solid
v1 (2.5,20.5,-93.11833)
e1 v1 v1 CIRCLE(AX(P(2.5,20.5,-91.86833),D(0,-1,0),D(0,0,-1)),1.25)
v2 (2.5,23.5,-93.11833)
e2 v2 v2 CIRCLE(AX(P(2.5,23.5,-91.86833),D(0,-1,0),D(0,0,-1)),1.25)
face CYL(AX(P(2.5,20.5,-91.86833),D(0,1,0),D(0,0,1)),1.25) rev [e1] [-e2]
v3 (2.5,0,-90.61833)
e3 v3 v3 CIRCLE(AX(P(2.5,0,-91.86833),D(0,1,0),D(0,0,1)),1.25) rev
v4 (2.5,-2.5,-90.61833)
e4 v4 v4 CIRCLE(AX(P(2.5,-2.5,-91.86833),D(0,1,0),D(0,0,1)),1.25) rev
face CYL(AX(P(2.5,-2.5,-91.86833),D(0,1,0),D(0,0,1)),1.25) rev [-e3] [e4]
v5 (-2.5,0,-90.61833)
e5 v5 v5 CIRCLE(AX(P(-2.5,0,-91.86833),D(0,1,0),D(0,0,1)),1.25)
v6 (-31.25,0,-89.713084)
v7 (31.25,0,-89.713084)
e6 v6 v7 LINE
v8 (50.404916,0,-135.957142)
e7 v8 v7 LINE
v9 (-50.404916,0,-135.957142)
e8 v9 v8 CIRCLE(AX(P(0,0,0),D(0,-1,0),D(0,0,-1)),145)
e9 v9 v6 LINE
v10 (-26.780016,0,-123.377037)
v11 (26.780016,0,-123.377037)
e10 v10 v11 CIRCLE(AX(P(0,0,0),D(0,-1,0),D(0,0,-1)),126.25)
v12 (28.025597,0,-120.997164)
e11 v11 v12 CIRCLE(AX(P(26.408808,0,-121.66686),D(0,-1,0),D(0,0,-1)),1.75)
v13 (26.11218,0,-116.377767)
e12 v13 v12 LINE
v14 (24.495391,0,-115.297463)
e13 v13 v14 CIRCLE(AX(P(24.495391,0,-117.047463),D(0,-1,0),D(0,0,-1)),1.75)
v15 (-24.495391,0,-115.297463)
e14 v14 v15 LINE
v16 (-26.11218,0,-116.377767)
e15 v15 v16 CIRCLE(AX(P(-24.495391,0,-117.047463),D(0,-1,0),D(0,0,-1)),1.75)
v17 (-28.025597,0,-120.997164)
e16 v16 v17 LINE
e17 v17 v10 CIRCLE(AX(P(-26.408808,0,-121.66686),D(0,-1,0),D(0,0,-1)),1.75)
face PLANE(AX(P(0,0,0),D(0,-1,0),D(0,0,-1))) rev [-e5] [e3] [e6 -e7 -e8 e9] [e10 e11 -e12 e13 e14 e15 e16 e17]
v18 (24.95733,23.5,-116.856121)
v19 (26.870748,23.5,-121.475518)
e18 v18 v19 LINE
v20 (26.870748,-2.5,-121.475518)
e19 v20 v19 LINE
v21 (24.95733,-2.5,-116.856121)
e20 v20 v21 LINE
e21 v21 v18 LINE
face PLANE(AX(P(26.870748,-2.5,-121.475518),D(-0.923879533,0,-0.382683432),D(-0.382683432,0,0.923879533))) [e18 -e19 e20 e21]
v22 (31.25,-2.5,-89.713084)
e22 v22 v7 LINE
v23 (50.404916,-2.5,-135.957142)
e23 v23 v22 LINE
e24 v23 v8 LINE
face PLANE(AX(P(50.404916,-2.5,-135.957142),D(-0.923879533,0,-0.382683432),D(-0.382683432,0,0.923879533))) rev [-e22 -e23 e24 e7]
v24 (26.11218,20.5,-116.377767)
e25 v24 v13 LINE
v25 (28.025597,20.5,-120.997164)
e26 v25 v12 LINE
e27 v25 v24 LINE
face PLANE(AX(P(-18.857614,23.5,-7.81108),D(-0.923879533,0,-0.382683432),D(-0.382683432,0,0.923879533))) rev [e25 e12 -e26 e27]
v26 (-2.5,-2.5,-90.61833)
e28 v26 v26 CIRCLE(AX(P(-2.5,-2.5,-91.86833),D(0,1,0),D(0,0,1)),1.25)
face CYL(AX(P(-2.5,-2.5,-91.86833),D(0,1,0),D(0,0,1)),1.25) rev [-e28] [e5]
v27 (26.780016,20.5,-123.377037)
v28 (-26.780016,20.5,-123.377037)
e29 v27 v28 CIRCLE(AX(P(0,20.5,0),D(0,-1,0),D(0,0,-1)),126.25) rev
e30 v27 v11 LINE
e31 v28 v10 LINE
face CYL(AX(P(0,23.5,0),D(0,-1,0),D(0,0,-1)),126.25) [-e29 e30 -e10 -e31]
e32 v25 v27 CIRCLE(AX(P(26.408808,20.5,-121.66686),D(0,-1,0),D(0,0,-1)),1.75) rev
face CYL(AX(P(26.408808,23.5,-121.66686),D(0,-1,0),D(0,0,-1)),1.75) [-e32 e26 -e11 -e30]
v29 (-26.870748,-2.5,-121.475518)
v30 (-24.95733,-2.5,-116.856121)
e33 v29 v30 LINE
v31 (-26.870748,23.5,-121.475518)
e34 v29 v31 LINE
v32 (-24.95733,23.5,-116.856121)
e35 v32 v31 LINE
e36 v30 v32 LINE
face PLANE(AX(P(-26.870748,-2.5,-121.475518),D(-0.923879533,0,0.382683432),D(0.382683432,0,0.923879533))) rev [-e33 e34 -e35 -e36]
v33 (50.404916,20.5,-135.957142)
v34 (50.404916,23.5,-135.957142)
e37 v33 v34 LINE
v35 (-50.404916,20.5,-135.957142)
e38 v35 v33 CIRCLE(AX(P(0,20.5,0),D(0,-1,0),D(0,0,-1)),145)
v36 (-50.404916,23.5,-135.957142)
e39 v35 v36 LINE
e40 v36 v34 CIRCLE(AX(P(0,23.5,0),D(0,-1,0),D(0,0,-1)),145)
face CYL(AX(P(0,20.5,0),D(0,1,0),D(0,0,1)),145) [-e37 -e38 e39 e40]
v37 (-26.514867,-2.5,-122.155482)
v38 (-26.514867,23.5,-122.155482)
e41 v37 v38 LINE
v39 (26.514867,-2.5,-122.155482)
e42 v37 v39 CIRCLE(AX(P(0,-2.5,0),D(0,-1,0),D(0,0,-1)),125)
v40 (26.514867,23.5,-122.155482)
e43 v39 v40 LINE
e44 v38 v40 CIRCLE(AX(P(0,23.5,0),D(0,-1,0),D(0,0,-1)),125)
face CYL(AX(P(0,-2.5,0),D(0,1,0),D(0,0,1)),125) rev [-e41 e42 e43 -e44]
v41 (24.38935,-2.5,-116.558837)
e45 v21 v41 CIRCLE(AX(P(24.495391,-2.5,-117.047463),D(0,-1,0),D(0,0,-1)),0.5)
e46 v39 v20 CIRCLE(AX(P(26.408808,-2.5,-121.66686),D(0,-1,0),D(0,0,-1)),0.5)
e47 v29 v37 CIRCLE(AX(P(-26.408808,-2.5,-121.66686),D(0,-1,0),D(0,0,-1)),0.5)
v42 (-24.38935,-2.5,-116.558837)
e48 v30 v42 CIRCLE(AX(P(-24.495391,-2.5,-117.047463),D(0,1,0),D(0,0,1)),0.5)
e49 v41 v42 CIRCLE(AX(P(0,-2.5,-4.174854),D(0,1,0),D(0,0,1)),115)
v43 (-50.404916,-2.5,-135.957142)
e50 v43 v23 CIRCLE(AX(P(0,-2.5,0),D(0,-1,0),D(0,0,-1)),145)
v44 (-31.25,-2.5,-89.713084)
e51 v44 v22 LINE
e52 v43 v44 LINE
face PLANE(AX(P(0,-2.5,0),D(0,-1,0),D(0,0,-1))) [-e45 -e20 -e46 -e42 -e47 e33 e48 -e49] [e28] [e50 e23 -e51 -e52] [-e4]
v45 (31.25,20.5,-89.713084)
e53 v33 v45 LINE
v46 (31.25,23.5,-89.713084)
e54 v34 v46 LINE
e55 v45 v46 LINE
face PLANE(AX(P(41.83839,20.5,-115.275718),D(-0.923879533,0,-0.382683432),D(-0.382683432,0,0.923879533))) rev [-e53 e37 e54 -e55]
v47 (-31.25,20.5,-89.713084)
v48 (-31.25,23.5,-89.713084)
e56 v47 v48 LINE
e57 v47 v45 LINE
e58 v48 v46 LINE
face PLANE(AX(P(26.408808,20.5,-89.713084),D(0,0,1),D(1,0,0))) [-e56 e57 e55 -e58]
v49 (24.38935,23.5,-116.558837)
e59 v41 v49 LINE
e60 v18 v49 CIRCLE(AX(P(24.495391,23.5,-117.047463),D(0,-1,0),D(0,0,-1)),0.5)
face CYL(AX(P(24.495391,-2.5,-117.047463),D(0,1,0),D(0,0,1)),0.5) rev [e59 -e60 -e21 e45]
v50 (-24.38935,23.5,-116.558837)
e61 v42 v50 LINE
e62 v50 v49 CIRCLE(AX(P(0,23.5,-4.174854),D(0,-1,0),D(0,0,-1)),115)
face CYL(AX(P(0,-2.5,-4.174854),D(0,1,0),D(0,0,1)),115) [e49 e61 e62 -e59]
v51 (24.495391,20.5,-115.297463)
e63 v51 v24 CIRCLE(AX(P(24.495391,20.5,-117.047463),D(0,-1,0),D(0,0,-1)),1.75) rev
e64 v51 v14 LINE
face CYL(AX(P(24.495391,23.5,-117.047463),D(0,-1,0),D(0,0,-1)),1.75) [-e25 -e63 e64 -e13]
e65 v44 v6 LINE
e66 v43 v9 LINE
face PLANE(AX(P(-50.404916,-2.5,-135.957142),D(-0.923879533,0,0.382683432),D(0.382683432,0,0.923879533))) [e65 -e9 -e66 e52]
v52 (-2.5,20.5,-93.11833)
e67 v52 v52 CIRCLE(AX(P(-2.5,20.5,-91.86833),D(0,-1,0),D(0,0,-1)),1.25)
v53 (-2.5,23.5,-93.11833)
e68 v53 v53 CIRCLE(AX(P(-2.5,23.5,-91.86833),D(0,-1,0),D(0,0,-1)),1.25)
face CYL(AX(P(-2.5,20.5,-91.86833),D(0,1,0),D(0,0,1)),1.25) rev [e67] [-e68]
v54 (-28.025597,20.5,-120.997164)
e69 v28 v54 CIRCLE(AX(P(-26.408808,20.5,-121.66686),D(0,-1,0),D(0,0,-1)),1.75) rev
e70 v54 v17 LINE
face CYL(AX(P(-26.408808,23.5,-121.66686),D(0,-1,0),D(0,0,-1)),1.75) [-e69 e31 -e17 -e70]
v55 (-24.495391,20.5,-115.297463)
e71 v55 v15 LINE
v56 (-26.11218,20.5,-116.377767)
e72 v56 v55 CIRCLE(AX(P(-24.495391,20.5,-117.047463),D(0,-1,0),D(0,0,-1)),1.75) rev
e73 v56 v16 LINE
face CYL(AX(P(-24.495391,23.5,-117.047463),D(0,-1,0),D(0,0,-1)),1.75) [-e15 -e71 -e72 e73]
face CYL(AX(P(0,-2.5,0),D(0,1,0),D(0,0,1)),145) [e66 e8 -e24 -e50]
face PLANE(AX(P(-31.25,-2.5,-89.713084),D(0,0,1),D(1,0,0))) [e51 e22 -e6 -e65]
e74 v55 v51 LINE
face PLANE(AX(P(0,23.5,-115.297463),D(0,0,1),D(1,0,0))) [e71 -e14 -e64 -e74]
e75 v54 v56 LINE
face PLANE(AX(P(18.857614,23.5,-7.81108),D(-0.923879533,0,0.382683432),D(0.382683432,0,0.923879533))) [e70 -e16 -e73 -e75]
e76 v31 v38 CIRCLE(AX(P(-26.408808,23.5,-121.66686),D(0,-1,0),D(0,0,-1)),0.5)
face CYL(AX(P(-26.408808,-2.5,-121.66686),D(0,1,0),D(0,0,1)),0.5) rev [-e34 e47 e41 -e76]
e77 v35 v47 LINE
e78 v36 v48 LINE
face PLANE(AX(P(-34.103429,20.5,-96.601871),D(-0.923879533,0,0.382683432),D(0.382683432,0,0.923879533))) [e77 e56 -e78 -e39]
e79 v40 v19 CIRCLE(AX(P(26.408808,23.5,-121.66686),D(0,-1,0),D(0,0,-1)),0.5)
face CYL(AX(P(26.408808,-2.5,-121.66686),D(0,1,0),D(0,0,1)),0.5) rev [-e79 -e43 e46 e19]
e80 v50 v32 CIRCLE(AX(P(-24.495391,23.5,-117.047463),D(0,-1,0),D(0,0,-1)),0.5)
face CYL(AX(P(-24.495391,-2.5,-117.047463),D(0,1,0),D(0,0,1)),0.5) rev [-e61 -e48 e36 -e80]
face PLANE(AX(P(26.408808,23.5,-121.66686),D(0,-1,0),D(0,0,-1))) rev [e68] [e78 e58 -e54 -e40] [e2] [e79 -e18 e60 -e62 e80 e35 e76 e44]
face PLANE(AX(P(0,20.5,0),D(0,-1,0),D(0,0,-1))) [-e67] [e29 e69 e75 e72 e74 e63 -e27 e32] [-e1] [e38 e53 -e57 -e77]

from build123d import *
from build123d.topology import SkipClean

# Parameters (mm, degrees)
SKETCH1_R           = 1.25
BOSS_EXTRUDE1_DEPTH = 2.5
BOSS_EXTRUDE2_START = 23.5
BOSS_EXTRUDE2_DEPTH = 26
BOSS_EXTRUDE3_START = 23.5
SKETCH1_4_R         = 1.25
BOSS_EXTRUDE3_DEPTH = 3


with BuildPart() as part:
    # Sketch1 → Boss-Extrude1 (new body)
    with BuildSketch(Plane(origin=(0, 0, 0), x_dir=(1, 0, 0), z_dir=(0, 1, 0))):
        with BuildLine():
            Line((-50.40491586, 135.957141986), (-31.25, 89.71308433))
            Line((-31.25, 89.71308433), (31.25, 89.71308433))
            Line((31.25, 89.71308433), (50.40491586, 135.957141986))
            ThreePointArc((50.40491586, 135.957141986), (0, 145), (-50.40491586, 135.957141986))
        make_face()
        with Locations(Location((-2.5, 91.868329805, 0), (0, 0, 270))):
            Circle(SKETCH1_R, mode=Mode.SUBTRACT)
        with Locations(Location((2.5, 91.868329805, 0), (0, 0, 270))):
            Circle(SKETCH1_R, mode=Mode.SUBTRACT)
        with BuildLine():
            Line((-26.870747539, 121.475518488), (-24.957330377, 116.856120826))
            ThreePointArc((-24.957330377, 116.856120826), (-24.727253788, 116.604473302), (-24.389349959, 116.558836529))
            ThreePointArc((-24.389349959, 116.558836529), (0, 119.174853647), (24.389349959, 116.558836529))
            ThreePointArc((24.389349959, 116.558836529), (24.727253788, 116.604473302), (24.957330377, 116.856120826))
            Line((24.957330377, 116.856120826), (26.870747539, 121.475518488))
            ThreePointArc((26.870747539, 121.475518488), (26.851801477, 121.898714852), (26.514867242, 122.155482133))
            ThreePointArc((26.514867242, 122.155482133), (0, 125), (-26.514867242, 122.155482133))
            ThreePointArc((-26.514867242, 122.155482133), (-26.851801477, 121.898714852), (-26.870747539, 121.475518488))
        make_face(mode=Mode.SUBTRACT)
    extrude(amount=-BOSS_EXTRUDE1_DEPTH)

    # Sketch1<3> → Boss-Extrude2 (add)
    with SkipClean():  # the faces are left unmerged after this step: merging them gives an invalid solid
        with BuildSketch(Plane(origin=(0, 0, 0), x_dir=(1, 0, 0), z_dir=(0, 1, 0)).offset(BOSS_EXTRUDE2_START)):
            with BuildLine():
                ThreePointArc((-26.780015914, 123.377036954), (-27.959285739, 122.478351471), (-28.025596955, 120.997164198))
                Line((-28.025596955, 120.997164198), (-26.112179793, 116.377766535))
                ThreePointArc((-26.112179793, 116.377766535), (-25.467638519, 115.59239072), (-24.495390611, 115.297462542))
                Line((-24.495390611, 115.297462542), (24.495390611, 115.297462542))
                ThreePointArc((24.495390611, 115.297462542), (25.467638519, 115.59239072), (26.112179793, 116.377766535))
                Line((26.112179793, 116.377766535), (28.025596955, 120.997164198))
                ThreePointArc((28.025596955, 120.997164198), (27.959285739, 122.478351471), (26.780015914, 123.377036954))
                ThreePointArc((26.780015914, 123.377036954), (0, 126.25), (-26.780015914, 123.377036954))
            make_face()
            with BuildLine():
                Line((-24.957330377, 116.856120826), (-26.870747539, 121.475518488))
                ThreePointArc((-26.870747539, 121.475518488), (-26.851801477, 121.898714852), (-26.514867242, 122.155482133))
                ThreePointArc((-26.514867242, 122.155482133), (0, 125), (26.514867242, 122.155482133))
                ThreePointArc((26.514867242, 122.155482133), (26.851801477, 121.898714852), (26.870747539, 121.475518488))
                Line((26.870747539, 121.475518488), (24.957330377, 116.856120826))
                ThreePointArc((24.957330377, 116.856120826), (24.727253788, 116.604473302), (24.389349959, 116.558836529))
                ThreePointArc((24.389349959, 116.558836529), (0, 119.174853647), (-24.389349959, 116.558836529))
                ThreePointArc((-24.389349959, 116.558836529), (-24.727253788, 116.604473302), (-24.957330377, 116.856120826))
            make_face(mode=Mode.SUBTRACT)
        extrude(amount=-BOSS_EXTRUDE2_DEPTH)
    add(part.part.scale(1), mode=Mode.REPLACE)  # the faces are merged on a copy

    # Sketch1<4> → Boss-Extrude3 (add)
    # profile 1 of 2: a face of its own
    with BuildSketch(Plane(origin=(0, 0, 0), x_dir=(1, 0, 0), z_dir=(0, 1, 0)).offset(BOSS_EXTRUDE3_START)):
        with BuildLine():
            ThreePointArc((-50.40491586, 135.957141986), (0, 145), (50.40491586, 135.957141986))
            Line((50.40491586, 135.957141986), (31.25, 89.71308433))
            Line((31.25, 89.71308433), (-31.25, 89.71308433))
            Line((-31.25, 89.71308433), (-50.40491586, 135.957141986))
        make_face()
        with Locations(Location((2.5, 91.868329805, 0), (0, 0, 270))):
            Circle(SKETCH1_4_R, mode=Mode.SUBTRACT)
        with Locations(Location((-2.5, 91.868329805, 0), (0, 0, 270))):
            Circle(SKETCH1_4_R, mode=Mode.SUBTRACT)
        with BuildLine():
            Line((-28.025596955, 120.997164198), (-26.112179793, 116.377766535))
            ThreePointArc((-26.112179793, 116.377766535), (-25.467638519, 115.59239072), (-24.495390611, 115.297462542))
            Line((-24.495390611, 115.297462542), (24.495390611, 115.297462542))
            ThreePointArc((24.495390611, 115.297462542), (25.467638519, 115.59239072), (26.112179793, 116.377766535))
            Line((26.112179793, 116.377766535), (28.025596955, 120.997164198))
            ThreePointArc((28.025596955, 120.997164198), (27.959285739, 122.478351471), (26.780015914, 123.377036954))
            ThreePointArc((26.780015914, 123.377036954), (0, 126.25), (-26.780015914, 123.377036954))
            ThreePointArc((-26.780015914, 123.377036954), (-27.959285739, 122.478351471), (-28.025596955, 120.997164198))
        make_face(mode=Mode.SUBTRACT)
    # profile 2 of 2: a face of its own
    with BuildSketch(Plane(origin=(0, 0, 0), x_dir=(1, 0, 0), z_dir=(0, 1, 0)).offset(BOSS_EXTRUDE3_START)):
        with BuildLine():
            ThreePointArc((-28.025596955, 120.997164198), (-27.959285739, 122.478351471), (-26.780015914, 123.377036954))
            ThreePointArc((-26.780015914, 123.377036954), (0, 126.25), (26.780015914, 123.377036954))
            ThreePointArc((26.780015914, 123.377036954), (27.959285739, 122.478351471), (28.025596955, 120.997164198))
            Line((28.025596955, 120.997164198), (26.112179793, 116.377766535))
            ThreePointArc((26.112179793, 116.377766535), (25.467638519, 115.59239072), (24.495390611, 115.297462542))
            Line((24.495390611, 115.297462542), (-24.495390611, 115.297462542))
            ThreePointArc((-24.495390611, 115.297462542), (-25.467638519, 115.59239072), (-26.112179793, 116.377766535))
            Line((-26.112179793, 116.377766535), (-28.025596955, 120.997164198))
        make_face()
        with BuildLine():
            Line((26.870747539, 121.475518488), (24.957330377, 116.856120826))
            ThreePointArc((24.957330377, 116.856120826), (24.727253788, 116.604473302), (24.389349959, 116.558836529))
            ThreePointArc((24.389349959, 116.558836529), (0, 119.174853647), (-24.389349959, 116.558836529))
            ThreePointArc((-24.389349959, 116.558836529), (-24.727253788, 116.604473302), (-24.957330377, 116.856120826))
            Line((-24.957330377, 116.856120826), (-26.870747539, 121.475518488))
            ThreePointArc((-26.870747539, 121.475518488), (-26.851801477, 121.898714852), (-26.514867242, 122.155482133))
            ThreePointArc((-26.514867242, 122.155482133), (0, 125), (26.514867242, 122.155482133))
            ThreePointArc((26.514867242, 122.155482133), (26.851801477, 121.898714852), (26.870747539, 121.475518488))
        make_face(mode=Mode.SUBTRACT)
    extrude(amount=-BOSS_EXTRUDE3_DEPTH)


solid = part.part
